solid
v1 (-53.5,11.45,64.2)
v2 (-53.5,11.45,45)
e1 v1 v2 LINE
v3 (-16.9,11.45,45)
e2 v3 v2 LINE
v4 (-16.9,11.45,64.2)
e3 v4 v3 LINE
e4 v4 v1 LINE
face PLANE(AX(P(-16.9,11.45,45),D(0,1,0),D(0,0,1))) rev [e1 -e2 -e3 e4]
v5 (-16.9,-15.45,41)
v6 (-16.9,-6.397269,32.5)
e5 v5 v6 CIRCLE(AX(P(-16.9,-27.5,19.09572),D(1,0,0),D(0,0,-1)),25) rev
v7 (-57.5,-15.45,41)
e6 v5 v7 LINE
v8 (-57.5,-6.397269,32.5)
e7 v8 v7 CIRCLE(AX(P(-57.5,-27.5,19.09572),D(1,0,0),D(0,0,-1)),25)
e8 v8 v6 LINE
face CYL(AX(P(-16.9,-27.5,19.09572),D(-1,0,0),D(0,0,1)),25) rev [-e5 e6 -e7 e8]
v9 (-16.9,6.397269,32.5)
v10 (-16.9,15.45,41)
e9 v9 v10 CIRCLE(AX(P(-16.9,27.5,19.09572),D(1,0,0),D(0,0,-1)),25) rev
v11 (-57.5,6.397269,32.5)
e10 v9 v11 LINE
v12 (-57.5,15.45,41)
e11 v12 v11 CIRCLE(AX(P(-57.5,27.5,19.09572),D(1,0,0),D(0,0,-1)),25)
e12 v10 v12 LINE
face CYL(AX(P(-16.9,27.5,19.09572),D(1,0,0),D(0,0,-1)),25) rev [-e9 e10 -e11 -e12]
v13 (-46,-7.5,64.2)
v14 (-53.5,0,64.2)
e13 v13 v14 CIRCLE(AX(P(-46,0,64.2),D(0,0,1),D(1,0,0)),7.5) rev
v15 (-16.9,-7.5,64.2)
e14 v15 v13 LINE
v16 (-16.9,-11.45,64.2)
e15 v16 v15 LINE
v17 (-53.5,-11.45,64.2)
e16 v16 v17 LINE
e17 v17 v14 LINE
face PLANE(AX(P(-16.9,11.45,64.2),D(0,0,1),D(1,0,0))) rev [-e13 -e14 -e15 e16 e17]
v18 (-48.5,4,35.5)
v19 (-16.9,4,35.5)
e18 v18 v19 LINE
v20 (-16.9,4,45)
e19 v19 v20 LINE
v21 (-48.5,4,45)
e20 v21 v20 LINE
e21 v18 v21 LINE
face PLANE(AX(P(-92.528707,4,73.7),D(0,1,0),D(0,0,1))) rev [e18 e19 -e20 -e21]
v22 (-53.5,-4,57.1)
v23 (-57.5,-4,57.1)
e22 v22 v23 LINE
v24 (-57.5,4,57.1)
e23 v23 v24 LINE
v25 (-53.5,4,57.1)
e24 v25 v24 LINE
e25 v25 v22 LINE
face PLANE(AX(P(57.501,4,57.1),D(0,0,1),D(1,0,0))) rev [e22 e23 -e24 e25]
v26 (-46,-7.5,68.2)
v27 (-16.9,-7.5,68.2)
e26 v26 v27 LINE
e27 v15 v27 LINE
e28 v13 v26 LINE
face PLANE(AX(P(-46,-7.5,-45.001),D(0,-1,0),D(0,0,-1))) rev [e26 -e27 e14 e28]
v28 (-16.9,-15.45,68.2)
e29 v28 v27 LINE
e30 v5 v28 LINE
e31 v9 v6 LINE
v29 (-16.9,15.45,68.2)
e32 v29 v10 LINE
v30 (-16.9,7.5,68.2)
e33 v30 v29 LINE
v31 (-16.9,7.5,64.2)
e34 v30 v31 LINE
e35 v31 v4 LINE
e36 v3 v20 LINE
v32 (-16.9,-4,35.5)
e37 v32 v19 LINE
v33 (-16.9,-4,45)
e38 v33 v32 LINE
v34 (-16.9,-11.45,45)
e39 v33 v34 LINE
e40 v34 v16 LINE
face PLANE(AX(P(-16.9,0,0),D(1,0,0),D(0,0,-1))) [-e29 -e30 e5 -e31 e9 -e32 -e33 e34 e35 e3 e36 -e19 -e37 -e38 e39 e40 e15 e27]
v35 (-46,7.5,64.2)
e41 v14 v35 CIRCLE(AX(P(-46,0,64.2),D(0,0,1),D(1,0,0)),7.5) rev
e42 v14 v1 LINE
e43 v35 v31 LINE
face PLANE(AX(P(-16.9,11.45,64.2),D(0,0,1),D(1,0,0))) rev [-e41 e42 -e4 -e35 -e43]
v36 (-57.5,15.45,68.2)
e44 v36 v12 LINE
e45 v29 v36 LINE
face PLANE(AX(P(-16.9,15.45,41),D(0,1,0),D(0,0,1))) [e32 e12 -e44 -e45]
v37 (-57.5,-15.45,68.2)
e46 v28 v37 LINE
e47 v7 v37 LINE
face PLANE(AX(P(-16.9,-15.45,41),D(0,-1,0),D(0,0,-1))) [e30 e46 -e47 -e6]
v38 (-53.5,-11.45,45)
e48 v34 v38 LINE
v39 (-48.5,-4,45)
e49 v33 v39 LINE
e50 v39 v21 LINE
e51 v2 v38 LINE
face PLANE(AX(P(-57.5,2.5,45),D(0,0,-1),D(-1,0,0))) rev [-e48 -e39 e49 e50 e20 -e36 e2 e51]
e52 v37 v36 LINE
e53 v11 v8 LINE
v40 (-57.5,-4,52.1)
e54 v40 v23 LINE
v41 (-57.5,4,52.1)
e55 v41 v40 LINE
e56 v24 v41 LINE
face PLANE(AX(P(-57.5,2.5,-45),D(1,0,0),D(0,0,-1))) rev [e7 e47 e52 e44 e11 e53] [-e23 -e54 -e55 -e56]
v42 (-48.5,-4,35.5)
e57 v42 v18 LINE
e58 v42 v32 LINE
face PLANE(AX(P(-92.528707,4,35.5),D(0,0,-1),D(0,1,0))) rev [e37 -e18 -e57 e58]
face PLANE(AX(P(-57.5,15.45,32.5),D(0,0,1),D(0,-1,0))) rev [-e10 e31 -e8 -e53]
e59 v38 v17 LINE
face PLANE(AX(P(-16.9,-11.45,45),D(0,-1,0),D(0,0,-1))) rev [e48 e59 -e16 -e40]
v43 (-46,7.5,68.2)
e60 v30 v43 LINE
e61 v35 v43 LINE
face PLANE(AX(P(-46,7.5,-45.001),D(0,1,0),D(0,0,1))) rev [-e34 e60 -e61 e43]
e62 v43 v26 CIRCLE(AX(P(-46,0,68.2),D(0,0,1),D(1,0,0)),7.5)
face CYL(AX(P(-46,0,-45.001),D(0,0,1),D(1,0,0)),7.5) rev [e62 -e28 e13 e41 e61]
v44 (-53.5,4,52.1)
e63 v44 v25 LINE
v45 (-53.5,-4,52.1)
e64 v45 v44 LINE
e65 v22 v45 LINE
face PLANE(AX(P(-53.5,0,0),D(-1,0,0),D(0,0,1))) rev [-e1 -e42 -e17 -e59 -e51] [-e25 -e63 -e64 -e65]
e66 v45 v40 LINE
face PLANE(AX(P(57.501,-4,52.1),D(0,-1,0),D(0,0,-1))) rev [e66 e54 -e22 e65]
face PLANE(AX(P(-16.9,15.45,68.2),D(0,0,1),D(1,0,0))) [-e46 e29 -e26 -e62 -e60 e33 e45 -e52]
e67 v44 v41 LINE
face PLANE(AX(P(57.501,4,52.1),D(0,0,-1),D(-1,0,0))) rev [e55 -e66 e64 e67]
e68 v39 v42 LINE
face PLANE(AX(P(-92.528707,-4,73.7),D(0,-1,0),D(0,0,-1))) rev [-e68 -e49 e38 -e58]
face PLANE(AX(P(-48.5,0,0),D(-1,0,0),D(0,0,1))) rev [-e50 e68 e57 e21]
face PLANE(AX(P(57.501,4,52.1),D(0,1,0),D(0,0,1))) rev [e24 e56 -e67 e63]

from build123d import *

# Parameters (mm, degrees)
SKETCH1_W               = 115
SKETCH1_H               = 90
BOSS_EXTRUDE1_DEPTH     = 2.5
SKETCH2_W               = 27.2
SKETCH2_H               = 30.9
SKETCH2_W_2             = 19.2
SKETCH2_H_2             = 22.9
BOSS_EXTRUDE2_DEPTH     = 40.6
SKETCH3_W               = 19.2
SKETCH3_H               = 22.9
BOSS_EXTRUDE3_DEPTH     = 4
CUT_EXTRUDE1_REACH      = 136.592
SKETCH4_W               = 5
SKETCH4_H               = 8
FILLET1_R               = 25
SKETCH5_W               = 38.2
SKETCH5_H               = 8
CUT_EXTRUDE2_DEPTH      = 39.6
CUT_EXTRUDE3_REACH      = 92.993
SKETCH6_W               = 20
SKETCH6_H               = 9.5
CUT_EXTRUDE4_REACH      = 129.903
CUT_EXTRUDE5_DEPTH      = 135.591762378
CUT_EXTRUDE5_DEPTH_BACK = 135.591762378
SKETCH9_W               = 100.7
SKETCH9_H               = 30.9
CUT_EXTRUDE6_REACH      = 92.993


# Read off the part's stored shape, not the designer's step: Mirror1
with BuildPart() as part:
    # Sketch1 → Boss-Extrude1 (new, symmetric)
    with BuildSketch(Plane(origin=(0, 0, 0), x_dir=(1, 0, 0), z_dir=(0, 1, 0))):
        Rectangle(SKETCH1_W, SKETCH1_H)
    extrude(amount=BOSS_EXTRUDE1_DEPTH, both=True)

    # Sketch2 → Boss-Extrude2 (add)
    with BuildSketch(Plane.ZY.offset(57.5)):
        with Locations((54.6, 0)):
            Rectangle(SKETCH2_W, SKETCH2_H)
        with Locations((54.6, 0)):
            Rectangle(SKETCH2_W_2, SKETCH2_H_2, mode=Mode.SUBTRACT)
    extrude(amount=-BOSS_EXTRUDE2_DEPTH)

    # Sketch3 → Boss-Extrude3 (add)
    with BuildSketch(Plane.ZY.offset(57.5)):
        with Locations((54.6, 0)):
            Rectangle(SKETCH3_W, SKETCH3_H)
    extrude(amount=-BOSS_EXTRUDE3_DEPTH)

    # Sketch4 → Cut-Extrude1 (cut, up to next)
    with BuildSketch(Plane.ZY.offset(57.5), mode=Mode.PRIVATE) as cut_extrude1_sk1:
        with Locations((54.6, 0)):
            Rectangle(SKETCH4_W, SKETCH4_H)
    cut_extrude1_tool1 = extrude(cut_extrude1_sk1.sketch, amount=-CUT_EXTRUDE1_REACH, mode=Mode.PRIVATE) & part.part
    add(cut_extrude1_tool1.solids().sort_by_distance((-57.5, 0, 54.6))[0], mode=Mode.SUBTRACT)

    # Fillet1
    # the kernel refuses this fillet: 25 mm, written as the material it adds along each edge
    with BuildSketch(Plane(origin=(-57.5, -2.5, 41), x_dir=(0, 0, -1), z_dir=(1, 0, 0))) as fillet1_piece_1:
        with BuildLine():
            CenterArc((21.904280404, -25), FILLET1_R, 90, 61.183893167)
            Line((0, -12.95), (-0.438085608, -12.709))
            ThreePointArc((-0.438085608, -12.709), (-0.5, -6.475), (-0.5, 0))
            Line((-0.5, 0), (0, 0.5))
            Line((0, 0.5), (21.904280404, 0.5))
            Line((21.904280404, 0.5), (21.904280404, 0))
        make_face()
    extrude(amount=40.6)
    with BuildSketch(Plane(origin=(-57.5, 2.5, 41), x_dir=(0, 0, -1), z_dir=(1, 0, 0))) as fillet1_piece_2:
        with BuildLine():
            CenterArc((21.904280404, 25), FILLET1_R, 208.816106833, 61.183893167)
            Line((0, 12.95), (-0.438085608, 12.709))
            ThreePointArc((-0.438085608, 12.709), (-0.5, 6.475), (-0.5, 0))
            Line((-0.5, 0), (0, -0.5))
            Line((0, -0.5), (21.904280404, -0.5))
            Line((21.904280404, -0.5), (21.904280404, 0))
        make_face()
    extrude(amount=40.6)

    # Sketch5 → Cut-Extrude2 (cut)
    with BuildSketch(Plane(origin=(-8.9, 0, 0), x_dir=(0, 0, -1), z_dir=(1, 0, 0))):
        with Locations((-54.6, 0)):
            Rectangle(SKETCH5_W, SKETCH5_H)
    extrude(amount=-CUT_EXTRUDE2_DEPTH, mode=Mode.SUBTRACT)

    # Sketch6 → Cut-Extrude3 (cut, up to next)
    with BuildSketch(Plane(origin=(0, 2.5, 0), x_dir=(1, 0, 0), z_dir=(0, 1, 0)), mode=Mode.PRIVATE) as cut_extrude3_sk1:
        with Locations((1.1, -40.25)):
            Rectangle(SKETCH6_W, SKETCH6_H)
    cut_extrude3_tool1 = extrude(cut_extrude3_sk1.sketch, amount=-CUT_EXTRUDE3_REACH, mode=Mode.PRIVATE) & part.part
    add(cut_extrude3_tool1.solids().sort_by_distance((1.1, 2.5, 40.25))[0], mode=Mode.SUBTRACT)

    # Sketch8 → Cut-Extrude4 (cut, up to next)
    with BuildSketch(Plane.XY.offset(68.2), mode=Mode.PRIVATE) as cut_extrude4_sk1:
        with BuildLine():
            Line((-46, 7.5), (-16, 7.5))
            ThreePointArc((-16, 7.5), (-8.5, 0), (-16, -7.5))
            Line((-16, -7.5), (-46, -7.5))
            ThreePointArc((-46, -7.5), (-53.5, 0), (-46, 7.5))
        make_face()
    cut_extrude4_tool1 = extrude(cut_extrude4_sk1.sketch, amount=-CUT_EXTRUDE4_REACH, mode=Mode.PRIVATE) & part.part
    add(cut_extrude4_tool1.solids().sort_by_distance((-31, 0, 68.2))[0], mode=Mode.SUBTRACT)

    # Mirror1
    split(bisect_by=Plane.XY, keep=Keep.TOP)

    # Mirror1 2: part across plane


with BuildPart() as part_1:
    add(part.part)
    add(part.part.mirror(Plane.XY))

    # Sketch9 → Cut-Extrude5 (cut, two sides: drawn at the far end of the back side and taken through both)
    with BuildSketch(Plane(origin=(57.5, 0, 0), x_dir=(0, 0, -1), z_dir=(1, 0, 0)).offset(-CUT_EXTRUDE5_DEPTH_BACK)):
        with Locations((17.85, 0)):
            Rectangle(SKETCH9_W, SKETCH9_H)
    extrude(amount=CUT_EXTRUDE5_DEPTH + CUT_EXTRUDE5_DEPTH_BACK, mode=Mode.SUBTRACT)

    # Sketch10 → Cut-Extrude6 (cut, up to next)
    with BuildSketch(Plane(origin=(0, 2.5, 0), x_dir=(1, 0, 0), z_dir=(0, 1, 0)), mode=Mode.PRIVATE) as cut_extrude6_sk1:
        Polygon((57.5, -32.5), (-16.9, -32.5), (-16.9, -35.5), (11.1, -35.5), (11.1, -45), (57.5, -45), align=None)
    cut_extrude6_tool1 = extrude(cut_extrude6_sk1.sketch, amount=-CUT_EXTRUDE6_REACH, mode=Mode.PRIVATE) & part_1.part
    add(cut_extrude6_tool1.solids().sort_by_distance((29.593976, 2.5, 38.149096))[0], mode=Mode.SUBTRACT)


solid = part_1.part
